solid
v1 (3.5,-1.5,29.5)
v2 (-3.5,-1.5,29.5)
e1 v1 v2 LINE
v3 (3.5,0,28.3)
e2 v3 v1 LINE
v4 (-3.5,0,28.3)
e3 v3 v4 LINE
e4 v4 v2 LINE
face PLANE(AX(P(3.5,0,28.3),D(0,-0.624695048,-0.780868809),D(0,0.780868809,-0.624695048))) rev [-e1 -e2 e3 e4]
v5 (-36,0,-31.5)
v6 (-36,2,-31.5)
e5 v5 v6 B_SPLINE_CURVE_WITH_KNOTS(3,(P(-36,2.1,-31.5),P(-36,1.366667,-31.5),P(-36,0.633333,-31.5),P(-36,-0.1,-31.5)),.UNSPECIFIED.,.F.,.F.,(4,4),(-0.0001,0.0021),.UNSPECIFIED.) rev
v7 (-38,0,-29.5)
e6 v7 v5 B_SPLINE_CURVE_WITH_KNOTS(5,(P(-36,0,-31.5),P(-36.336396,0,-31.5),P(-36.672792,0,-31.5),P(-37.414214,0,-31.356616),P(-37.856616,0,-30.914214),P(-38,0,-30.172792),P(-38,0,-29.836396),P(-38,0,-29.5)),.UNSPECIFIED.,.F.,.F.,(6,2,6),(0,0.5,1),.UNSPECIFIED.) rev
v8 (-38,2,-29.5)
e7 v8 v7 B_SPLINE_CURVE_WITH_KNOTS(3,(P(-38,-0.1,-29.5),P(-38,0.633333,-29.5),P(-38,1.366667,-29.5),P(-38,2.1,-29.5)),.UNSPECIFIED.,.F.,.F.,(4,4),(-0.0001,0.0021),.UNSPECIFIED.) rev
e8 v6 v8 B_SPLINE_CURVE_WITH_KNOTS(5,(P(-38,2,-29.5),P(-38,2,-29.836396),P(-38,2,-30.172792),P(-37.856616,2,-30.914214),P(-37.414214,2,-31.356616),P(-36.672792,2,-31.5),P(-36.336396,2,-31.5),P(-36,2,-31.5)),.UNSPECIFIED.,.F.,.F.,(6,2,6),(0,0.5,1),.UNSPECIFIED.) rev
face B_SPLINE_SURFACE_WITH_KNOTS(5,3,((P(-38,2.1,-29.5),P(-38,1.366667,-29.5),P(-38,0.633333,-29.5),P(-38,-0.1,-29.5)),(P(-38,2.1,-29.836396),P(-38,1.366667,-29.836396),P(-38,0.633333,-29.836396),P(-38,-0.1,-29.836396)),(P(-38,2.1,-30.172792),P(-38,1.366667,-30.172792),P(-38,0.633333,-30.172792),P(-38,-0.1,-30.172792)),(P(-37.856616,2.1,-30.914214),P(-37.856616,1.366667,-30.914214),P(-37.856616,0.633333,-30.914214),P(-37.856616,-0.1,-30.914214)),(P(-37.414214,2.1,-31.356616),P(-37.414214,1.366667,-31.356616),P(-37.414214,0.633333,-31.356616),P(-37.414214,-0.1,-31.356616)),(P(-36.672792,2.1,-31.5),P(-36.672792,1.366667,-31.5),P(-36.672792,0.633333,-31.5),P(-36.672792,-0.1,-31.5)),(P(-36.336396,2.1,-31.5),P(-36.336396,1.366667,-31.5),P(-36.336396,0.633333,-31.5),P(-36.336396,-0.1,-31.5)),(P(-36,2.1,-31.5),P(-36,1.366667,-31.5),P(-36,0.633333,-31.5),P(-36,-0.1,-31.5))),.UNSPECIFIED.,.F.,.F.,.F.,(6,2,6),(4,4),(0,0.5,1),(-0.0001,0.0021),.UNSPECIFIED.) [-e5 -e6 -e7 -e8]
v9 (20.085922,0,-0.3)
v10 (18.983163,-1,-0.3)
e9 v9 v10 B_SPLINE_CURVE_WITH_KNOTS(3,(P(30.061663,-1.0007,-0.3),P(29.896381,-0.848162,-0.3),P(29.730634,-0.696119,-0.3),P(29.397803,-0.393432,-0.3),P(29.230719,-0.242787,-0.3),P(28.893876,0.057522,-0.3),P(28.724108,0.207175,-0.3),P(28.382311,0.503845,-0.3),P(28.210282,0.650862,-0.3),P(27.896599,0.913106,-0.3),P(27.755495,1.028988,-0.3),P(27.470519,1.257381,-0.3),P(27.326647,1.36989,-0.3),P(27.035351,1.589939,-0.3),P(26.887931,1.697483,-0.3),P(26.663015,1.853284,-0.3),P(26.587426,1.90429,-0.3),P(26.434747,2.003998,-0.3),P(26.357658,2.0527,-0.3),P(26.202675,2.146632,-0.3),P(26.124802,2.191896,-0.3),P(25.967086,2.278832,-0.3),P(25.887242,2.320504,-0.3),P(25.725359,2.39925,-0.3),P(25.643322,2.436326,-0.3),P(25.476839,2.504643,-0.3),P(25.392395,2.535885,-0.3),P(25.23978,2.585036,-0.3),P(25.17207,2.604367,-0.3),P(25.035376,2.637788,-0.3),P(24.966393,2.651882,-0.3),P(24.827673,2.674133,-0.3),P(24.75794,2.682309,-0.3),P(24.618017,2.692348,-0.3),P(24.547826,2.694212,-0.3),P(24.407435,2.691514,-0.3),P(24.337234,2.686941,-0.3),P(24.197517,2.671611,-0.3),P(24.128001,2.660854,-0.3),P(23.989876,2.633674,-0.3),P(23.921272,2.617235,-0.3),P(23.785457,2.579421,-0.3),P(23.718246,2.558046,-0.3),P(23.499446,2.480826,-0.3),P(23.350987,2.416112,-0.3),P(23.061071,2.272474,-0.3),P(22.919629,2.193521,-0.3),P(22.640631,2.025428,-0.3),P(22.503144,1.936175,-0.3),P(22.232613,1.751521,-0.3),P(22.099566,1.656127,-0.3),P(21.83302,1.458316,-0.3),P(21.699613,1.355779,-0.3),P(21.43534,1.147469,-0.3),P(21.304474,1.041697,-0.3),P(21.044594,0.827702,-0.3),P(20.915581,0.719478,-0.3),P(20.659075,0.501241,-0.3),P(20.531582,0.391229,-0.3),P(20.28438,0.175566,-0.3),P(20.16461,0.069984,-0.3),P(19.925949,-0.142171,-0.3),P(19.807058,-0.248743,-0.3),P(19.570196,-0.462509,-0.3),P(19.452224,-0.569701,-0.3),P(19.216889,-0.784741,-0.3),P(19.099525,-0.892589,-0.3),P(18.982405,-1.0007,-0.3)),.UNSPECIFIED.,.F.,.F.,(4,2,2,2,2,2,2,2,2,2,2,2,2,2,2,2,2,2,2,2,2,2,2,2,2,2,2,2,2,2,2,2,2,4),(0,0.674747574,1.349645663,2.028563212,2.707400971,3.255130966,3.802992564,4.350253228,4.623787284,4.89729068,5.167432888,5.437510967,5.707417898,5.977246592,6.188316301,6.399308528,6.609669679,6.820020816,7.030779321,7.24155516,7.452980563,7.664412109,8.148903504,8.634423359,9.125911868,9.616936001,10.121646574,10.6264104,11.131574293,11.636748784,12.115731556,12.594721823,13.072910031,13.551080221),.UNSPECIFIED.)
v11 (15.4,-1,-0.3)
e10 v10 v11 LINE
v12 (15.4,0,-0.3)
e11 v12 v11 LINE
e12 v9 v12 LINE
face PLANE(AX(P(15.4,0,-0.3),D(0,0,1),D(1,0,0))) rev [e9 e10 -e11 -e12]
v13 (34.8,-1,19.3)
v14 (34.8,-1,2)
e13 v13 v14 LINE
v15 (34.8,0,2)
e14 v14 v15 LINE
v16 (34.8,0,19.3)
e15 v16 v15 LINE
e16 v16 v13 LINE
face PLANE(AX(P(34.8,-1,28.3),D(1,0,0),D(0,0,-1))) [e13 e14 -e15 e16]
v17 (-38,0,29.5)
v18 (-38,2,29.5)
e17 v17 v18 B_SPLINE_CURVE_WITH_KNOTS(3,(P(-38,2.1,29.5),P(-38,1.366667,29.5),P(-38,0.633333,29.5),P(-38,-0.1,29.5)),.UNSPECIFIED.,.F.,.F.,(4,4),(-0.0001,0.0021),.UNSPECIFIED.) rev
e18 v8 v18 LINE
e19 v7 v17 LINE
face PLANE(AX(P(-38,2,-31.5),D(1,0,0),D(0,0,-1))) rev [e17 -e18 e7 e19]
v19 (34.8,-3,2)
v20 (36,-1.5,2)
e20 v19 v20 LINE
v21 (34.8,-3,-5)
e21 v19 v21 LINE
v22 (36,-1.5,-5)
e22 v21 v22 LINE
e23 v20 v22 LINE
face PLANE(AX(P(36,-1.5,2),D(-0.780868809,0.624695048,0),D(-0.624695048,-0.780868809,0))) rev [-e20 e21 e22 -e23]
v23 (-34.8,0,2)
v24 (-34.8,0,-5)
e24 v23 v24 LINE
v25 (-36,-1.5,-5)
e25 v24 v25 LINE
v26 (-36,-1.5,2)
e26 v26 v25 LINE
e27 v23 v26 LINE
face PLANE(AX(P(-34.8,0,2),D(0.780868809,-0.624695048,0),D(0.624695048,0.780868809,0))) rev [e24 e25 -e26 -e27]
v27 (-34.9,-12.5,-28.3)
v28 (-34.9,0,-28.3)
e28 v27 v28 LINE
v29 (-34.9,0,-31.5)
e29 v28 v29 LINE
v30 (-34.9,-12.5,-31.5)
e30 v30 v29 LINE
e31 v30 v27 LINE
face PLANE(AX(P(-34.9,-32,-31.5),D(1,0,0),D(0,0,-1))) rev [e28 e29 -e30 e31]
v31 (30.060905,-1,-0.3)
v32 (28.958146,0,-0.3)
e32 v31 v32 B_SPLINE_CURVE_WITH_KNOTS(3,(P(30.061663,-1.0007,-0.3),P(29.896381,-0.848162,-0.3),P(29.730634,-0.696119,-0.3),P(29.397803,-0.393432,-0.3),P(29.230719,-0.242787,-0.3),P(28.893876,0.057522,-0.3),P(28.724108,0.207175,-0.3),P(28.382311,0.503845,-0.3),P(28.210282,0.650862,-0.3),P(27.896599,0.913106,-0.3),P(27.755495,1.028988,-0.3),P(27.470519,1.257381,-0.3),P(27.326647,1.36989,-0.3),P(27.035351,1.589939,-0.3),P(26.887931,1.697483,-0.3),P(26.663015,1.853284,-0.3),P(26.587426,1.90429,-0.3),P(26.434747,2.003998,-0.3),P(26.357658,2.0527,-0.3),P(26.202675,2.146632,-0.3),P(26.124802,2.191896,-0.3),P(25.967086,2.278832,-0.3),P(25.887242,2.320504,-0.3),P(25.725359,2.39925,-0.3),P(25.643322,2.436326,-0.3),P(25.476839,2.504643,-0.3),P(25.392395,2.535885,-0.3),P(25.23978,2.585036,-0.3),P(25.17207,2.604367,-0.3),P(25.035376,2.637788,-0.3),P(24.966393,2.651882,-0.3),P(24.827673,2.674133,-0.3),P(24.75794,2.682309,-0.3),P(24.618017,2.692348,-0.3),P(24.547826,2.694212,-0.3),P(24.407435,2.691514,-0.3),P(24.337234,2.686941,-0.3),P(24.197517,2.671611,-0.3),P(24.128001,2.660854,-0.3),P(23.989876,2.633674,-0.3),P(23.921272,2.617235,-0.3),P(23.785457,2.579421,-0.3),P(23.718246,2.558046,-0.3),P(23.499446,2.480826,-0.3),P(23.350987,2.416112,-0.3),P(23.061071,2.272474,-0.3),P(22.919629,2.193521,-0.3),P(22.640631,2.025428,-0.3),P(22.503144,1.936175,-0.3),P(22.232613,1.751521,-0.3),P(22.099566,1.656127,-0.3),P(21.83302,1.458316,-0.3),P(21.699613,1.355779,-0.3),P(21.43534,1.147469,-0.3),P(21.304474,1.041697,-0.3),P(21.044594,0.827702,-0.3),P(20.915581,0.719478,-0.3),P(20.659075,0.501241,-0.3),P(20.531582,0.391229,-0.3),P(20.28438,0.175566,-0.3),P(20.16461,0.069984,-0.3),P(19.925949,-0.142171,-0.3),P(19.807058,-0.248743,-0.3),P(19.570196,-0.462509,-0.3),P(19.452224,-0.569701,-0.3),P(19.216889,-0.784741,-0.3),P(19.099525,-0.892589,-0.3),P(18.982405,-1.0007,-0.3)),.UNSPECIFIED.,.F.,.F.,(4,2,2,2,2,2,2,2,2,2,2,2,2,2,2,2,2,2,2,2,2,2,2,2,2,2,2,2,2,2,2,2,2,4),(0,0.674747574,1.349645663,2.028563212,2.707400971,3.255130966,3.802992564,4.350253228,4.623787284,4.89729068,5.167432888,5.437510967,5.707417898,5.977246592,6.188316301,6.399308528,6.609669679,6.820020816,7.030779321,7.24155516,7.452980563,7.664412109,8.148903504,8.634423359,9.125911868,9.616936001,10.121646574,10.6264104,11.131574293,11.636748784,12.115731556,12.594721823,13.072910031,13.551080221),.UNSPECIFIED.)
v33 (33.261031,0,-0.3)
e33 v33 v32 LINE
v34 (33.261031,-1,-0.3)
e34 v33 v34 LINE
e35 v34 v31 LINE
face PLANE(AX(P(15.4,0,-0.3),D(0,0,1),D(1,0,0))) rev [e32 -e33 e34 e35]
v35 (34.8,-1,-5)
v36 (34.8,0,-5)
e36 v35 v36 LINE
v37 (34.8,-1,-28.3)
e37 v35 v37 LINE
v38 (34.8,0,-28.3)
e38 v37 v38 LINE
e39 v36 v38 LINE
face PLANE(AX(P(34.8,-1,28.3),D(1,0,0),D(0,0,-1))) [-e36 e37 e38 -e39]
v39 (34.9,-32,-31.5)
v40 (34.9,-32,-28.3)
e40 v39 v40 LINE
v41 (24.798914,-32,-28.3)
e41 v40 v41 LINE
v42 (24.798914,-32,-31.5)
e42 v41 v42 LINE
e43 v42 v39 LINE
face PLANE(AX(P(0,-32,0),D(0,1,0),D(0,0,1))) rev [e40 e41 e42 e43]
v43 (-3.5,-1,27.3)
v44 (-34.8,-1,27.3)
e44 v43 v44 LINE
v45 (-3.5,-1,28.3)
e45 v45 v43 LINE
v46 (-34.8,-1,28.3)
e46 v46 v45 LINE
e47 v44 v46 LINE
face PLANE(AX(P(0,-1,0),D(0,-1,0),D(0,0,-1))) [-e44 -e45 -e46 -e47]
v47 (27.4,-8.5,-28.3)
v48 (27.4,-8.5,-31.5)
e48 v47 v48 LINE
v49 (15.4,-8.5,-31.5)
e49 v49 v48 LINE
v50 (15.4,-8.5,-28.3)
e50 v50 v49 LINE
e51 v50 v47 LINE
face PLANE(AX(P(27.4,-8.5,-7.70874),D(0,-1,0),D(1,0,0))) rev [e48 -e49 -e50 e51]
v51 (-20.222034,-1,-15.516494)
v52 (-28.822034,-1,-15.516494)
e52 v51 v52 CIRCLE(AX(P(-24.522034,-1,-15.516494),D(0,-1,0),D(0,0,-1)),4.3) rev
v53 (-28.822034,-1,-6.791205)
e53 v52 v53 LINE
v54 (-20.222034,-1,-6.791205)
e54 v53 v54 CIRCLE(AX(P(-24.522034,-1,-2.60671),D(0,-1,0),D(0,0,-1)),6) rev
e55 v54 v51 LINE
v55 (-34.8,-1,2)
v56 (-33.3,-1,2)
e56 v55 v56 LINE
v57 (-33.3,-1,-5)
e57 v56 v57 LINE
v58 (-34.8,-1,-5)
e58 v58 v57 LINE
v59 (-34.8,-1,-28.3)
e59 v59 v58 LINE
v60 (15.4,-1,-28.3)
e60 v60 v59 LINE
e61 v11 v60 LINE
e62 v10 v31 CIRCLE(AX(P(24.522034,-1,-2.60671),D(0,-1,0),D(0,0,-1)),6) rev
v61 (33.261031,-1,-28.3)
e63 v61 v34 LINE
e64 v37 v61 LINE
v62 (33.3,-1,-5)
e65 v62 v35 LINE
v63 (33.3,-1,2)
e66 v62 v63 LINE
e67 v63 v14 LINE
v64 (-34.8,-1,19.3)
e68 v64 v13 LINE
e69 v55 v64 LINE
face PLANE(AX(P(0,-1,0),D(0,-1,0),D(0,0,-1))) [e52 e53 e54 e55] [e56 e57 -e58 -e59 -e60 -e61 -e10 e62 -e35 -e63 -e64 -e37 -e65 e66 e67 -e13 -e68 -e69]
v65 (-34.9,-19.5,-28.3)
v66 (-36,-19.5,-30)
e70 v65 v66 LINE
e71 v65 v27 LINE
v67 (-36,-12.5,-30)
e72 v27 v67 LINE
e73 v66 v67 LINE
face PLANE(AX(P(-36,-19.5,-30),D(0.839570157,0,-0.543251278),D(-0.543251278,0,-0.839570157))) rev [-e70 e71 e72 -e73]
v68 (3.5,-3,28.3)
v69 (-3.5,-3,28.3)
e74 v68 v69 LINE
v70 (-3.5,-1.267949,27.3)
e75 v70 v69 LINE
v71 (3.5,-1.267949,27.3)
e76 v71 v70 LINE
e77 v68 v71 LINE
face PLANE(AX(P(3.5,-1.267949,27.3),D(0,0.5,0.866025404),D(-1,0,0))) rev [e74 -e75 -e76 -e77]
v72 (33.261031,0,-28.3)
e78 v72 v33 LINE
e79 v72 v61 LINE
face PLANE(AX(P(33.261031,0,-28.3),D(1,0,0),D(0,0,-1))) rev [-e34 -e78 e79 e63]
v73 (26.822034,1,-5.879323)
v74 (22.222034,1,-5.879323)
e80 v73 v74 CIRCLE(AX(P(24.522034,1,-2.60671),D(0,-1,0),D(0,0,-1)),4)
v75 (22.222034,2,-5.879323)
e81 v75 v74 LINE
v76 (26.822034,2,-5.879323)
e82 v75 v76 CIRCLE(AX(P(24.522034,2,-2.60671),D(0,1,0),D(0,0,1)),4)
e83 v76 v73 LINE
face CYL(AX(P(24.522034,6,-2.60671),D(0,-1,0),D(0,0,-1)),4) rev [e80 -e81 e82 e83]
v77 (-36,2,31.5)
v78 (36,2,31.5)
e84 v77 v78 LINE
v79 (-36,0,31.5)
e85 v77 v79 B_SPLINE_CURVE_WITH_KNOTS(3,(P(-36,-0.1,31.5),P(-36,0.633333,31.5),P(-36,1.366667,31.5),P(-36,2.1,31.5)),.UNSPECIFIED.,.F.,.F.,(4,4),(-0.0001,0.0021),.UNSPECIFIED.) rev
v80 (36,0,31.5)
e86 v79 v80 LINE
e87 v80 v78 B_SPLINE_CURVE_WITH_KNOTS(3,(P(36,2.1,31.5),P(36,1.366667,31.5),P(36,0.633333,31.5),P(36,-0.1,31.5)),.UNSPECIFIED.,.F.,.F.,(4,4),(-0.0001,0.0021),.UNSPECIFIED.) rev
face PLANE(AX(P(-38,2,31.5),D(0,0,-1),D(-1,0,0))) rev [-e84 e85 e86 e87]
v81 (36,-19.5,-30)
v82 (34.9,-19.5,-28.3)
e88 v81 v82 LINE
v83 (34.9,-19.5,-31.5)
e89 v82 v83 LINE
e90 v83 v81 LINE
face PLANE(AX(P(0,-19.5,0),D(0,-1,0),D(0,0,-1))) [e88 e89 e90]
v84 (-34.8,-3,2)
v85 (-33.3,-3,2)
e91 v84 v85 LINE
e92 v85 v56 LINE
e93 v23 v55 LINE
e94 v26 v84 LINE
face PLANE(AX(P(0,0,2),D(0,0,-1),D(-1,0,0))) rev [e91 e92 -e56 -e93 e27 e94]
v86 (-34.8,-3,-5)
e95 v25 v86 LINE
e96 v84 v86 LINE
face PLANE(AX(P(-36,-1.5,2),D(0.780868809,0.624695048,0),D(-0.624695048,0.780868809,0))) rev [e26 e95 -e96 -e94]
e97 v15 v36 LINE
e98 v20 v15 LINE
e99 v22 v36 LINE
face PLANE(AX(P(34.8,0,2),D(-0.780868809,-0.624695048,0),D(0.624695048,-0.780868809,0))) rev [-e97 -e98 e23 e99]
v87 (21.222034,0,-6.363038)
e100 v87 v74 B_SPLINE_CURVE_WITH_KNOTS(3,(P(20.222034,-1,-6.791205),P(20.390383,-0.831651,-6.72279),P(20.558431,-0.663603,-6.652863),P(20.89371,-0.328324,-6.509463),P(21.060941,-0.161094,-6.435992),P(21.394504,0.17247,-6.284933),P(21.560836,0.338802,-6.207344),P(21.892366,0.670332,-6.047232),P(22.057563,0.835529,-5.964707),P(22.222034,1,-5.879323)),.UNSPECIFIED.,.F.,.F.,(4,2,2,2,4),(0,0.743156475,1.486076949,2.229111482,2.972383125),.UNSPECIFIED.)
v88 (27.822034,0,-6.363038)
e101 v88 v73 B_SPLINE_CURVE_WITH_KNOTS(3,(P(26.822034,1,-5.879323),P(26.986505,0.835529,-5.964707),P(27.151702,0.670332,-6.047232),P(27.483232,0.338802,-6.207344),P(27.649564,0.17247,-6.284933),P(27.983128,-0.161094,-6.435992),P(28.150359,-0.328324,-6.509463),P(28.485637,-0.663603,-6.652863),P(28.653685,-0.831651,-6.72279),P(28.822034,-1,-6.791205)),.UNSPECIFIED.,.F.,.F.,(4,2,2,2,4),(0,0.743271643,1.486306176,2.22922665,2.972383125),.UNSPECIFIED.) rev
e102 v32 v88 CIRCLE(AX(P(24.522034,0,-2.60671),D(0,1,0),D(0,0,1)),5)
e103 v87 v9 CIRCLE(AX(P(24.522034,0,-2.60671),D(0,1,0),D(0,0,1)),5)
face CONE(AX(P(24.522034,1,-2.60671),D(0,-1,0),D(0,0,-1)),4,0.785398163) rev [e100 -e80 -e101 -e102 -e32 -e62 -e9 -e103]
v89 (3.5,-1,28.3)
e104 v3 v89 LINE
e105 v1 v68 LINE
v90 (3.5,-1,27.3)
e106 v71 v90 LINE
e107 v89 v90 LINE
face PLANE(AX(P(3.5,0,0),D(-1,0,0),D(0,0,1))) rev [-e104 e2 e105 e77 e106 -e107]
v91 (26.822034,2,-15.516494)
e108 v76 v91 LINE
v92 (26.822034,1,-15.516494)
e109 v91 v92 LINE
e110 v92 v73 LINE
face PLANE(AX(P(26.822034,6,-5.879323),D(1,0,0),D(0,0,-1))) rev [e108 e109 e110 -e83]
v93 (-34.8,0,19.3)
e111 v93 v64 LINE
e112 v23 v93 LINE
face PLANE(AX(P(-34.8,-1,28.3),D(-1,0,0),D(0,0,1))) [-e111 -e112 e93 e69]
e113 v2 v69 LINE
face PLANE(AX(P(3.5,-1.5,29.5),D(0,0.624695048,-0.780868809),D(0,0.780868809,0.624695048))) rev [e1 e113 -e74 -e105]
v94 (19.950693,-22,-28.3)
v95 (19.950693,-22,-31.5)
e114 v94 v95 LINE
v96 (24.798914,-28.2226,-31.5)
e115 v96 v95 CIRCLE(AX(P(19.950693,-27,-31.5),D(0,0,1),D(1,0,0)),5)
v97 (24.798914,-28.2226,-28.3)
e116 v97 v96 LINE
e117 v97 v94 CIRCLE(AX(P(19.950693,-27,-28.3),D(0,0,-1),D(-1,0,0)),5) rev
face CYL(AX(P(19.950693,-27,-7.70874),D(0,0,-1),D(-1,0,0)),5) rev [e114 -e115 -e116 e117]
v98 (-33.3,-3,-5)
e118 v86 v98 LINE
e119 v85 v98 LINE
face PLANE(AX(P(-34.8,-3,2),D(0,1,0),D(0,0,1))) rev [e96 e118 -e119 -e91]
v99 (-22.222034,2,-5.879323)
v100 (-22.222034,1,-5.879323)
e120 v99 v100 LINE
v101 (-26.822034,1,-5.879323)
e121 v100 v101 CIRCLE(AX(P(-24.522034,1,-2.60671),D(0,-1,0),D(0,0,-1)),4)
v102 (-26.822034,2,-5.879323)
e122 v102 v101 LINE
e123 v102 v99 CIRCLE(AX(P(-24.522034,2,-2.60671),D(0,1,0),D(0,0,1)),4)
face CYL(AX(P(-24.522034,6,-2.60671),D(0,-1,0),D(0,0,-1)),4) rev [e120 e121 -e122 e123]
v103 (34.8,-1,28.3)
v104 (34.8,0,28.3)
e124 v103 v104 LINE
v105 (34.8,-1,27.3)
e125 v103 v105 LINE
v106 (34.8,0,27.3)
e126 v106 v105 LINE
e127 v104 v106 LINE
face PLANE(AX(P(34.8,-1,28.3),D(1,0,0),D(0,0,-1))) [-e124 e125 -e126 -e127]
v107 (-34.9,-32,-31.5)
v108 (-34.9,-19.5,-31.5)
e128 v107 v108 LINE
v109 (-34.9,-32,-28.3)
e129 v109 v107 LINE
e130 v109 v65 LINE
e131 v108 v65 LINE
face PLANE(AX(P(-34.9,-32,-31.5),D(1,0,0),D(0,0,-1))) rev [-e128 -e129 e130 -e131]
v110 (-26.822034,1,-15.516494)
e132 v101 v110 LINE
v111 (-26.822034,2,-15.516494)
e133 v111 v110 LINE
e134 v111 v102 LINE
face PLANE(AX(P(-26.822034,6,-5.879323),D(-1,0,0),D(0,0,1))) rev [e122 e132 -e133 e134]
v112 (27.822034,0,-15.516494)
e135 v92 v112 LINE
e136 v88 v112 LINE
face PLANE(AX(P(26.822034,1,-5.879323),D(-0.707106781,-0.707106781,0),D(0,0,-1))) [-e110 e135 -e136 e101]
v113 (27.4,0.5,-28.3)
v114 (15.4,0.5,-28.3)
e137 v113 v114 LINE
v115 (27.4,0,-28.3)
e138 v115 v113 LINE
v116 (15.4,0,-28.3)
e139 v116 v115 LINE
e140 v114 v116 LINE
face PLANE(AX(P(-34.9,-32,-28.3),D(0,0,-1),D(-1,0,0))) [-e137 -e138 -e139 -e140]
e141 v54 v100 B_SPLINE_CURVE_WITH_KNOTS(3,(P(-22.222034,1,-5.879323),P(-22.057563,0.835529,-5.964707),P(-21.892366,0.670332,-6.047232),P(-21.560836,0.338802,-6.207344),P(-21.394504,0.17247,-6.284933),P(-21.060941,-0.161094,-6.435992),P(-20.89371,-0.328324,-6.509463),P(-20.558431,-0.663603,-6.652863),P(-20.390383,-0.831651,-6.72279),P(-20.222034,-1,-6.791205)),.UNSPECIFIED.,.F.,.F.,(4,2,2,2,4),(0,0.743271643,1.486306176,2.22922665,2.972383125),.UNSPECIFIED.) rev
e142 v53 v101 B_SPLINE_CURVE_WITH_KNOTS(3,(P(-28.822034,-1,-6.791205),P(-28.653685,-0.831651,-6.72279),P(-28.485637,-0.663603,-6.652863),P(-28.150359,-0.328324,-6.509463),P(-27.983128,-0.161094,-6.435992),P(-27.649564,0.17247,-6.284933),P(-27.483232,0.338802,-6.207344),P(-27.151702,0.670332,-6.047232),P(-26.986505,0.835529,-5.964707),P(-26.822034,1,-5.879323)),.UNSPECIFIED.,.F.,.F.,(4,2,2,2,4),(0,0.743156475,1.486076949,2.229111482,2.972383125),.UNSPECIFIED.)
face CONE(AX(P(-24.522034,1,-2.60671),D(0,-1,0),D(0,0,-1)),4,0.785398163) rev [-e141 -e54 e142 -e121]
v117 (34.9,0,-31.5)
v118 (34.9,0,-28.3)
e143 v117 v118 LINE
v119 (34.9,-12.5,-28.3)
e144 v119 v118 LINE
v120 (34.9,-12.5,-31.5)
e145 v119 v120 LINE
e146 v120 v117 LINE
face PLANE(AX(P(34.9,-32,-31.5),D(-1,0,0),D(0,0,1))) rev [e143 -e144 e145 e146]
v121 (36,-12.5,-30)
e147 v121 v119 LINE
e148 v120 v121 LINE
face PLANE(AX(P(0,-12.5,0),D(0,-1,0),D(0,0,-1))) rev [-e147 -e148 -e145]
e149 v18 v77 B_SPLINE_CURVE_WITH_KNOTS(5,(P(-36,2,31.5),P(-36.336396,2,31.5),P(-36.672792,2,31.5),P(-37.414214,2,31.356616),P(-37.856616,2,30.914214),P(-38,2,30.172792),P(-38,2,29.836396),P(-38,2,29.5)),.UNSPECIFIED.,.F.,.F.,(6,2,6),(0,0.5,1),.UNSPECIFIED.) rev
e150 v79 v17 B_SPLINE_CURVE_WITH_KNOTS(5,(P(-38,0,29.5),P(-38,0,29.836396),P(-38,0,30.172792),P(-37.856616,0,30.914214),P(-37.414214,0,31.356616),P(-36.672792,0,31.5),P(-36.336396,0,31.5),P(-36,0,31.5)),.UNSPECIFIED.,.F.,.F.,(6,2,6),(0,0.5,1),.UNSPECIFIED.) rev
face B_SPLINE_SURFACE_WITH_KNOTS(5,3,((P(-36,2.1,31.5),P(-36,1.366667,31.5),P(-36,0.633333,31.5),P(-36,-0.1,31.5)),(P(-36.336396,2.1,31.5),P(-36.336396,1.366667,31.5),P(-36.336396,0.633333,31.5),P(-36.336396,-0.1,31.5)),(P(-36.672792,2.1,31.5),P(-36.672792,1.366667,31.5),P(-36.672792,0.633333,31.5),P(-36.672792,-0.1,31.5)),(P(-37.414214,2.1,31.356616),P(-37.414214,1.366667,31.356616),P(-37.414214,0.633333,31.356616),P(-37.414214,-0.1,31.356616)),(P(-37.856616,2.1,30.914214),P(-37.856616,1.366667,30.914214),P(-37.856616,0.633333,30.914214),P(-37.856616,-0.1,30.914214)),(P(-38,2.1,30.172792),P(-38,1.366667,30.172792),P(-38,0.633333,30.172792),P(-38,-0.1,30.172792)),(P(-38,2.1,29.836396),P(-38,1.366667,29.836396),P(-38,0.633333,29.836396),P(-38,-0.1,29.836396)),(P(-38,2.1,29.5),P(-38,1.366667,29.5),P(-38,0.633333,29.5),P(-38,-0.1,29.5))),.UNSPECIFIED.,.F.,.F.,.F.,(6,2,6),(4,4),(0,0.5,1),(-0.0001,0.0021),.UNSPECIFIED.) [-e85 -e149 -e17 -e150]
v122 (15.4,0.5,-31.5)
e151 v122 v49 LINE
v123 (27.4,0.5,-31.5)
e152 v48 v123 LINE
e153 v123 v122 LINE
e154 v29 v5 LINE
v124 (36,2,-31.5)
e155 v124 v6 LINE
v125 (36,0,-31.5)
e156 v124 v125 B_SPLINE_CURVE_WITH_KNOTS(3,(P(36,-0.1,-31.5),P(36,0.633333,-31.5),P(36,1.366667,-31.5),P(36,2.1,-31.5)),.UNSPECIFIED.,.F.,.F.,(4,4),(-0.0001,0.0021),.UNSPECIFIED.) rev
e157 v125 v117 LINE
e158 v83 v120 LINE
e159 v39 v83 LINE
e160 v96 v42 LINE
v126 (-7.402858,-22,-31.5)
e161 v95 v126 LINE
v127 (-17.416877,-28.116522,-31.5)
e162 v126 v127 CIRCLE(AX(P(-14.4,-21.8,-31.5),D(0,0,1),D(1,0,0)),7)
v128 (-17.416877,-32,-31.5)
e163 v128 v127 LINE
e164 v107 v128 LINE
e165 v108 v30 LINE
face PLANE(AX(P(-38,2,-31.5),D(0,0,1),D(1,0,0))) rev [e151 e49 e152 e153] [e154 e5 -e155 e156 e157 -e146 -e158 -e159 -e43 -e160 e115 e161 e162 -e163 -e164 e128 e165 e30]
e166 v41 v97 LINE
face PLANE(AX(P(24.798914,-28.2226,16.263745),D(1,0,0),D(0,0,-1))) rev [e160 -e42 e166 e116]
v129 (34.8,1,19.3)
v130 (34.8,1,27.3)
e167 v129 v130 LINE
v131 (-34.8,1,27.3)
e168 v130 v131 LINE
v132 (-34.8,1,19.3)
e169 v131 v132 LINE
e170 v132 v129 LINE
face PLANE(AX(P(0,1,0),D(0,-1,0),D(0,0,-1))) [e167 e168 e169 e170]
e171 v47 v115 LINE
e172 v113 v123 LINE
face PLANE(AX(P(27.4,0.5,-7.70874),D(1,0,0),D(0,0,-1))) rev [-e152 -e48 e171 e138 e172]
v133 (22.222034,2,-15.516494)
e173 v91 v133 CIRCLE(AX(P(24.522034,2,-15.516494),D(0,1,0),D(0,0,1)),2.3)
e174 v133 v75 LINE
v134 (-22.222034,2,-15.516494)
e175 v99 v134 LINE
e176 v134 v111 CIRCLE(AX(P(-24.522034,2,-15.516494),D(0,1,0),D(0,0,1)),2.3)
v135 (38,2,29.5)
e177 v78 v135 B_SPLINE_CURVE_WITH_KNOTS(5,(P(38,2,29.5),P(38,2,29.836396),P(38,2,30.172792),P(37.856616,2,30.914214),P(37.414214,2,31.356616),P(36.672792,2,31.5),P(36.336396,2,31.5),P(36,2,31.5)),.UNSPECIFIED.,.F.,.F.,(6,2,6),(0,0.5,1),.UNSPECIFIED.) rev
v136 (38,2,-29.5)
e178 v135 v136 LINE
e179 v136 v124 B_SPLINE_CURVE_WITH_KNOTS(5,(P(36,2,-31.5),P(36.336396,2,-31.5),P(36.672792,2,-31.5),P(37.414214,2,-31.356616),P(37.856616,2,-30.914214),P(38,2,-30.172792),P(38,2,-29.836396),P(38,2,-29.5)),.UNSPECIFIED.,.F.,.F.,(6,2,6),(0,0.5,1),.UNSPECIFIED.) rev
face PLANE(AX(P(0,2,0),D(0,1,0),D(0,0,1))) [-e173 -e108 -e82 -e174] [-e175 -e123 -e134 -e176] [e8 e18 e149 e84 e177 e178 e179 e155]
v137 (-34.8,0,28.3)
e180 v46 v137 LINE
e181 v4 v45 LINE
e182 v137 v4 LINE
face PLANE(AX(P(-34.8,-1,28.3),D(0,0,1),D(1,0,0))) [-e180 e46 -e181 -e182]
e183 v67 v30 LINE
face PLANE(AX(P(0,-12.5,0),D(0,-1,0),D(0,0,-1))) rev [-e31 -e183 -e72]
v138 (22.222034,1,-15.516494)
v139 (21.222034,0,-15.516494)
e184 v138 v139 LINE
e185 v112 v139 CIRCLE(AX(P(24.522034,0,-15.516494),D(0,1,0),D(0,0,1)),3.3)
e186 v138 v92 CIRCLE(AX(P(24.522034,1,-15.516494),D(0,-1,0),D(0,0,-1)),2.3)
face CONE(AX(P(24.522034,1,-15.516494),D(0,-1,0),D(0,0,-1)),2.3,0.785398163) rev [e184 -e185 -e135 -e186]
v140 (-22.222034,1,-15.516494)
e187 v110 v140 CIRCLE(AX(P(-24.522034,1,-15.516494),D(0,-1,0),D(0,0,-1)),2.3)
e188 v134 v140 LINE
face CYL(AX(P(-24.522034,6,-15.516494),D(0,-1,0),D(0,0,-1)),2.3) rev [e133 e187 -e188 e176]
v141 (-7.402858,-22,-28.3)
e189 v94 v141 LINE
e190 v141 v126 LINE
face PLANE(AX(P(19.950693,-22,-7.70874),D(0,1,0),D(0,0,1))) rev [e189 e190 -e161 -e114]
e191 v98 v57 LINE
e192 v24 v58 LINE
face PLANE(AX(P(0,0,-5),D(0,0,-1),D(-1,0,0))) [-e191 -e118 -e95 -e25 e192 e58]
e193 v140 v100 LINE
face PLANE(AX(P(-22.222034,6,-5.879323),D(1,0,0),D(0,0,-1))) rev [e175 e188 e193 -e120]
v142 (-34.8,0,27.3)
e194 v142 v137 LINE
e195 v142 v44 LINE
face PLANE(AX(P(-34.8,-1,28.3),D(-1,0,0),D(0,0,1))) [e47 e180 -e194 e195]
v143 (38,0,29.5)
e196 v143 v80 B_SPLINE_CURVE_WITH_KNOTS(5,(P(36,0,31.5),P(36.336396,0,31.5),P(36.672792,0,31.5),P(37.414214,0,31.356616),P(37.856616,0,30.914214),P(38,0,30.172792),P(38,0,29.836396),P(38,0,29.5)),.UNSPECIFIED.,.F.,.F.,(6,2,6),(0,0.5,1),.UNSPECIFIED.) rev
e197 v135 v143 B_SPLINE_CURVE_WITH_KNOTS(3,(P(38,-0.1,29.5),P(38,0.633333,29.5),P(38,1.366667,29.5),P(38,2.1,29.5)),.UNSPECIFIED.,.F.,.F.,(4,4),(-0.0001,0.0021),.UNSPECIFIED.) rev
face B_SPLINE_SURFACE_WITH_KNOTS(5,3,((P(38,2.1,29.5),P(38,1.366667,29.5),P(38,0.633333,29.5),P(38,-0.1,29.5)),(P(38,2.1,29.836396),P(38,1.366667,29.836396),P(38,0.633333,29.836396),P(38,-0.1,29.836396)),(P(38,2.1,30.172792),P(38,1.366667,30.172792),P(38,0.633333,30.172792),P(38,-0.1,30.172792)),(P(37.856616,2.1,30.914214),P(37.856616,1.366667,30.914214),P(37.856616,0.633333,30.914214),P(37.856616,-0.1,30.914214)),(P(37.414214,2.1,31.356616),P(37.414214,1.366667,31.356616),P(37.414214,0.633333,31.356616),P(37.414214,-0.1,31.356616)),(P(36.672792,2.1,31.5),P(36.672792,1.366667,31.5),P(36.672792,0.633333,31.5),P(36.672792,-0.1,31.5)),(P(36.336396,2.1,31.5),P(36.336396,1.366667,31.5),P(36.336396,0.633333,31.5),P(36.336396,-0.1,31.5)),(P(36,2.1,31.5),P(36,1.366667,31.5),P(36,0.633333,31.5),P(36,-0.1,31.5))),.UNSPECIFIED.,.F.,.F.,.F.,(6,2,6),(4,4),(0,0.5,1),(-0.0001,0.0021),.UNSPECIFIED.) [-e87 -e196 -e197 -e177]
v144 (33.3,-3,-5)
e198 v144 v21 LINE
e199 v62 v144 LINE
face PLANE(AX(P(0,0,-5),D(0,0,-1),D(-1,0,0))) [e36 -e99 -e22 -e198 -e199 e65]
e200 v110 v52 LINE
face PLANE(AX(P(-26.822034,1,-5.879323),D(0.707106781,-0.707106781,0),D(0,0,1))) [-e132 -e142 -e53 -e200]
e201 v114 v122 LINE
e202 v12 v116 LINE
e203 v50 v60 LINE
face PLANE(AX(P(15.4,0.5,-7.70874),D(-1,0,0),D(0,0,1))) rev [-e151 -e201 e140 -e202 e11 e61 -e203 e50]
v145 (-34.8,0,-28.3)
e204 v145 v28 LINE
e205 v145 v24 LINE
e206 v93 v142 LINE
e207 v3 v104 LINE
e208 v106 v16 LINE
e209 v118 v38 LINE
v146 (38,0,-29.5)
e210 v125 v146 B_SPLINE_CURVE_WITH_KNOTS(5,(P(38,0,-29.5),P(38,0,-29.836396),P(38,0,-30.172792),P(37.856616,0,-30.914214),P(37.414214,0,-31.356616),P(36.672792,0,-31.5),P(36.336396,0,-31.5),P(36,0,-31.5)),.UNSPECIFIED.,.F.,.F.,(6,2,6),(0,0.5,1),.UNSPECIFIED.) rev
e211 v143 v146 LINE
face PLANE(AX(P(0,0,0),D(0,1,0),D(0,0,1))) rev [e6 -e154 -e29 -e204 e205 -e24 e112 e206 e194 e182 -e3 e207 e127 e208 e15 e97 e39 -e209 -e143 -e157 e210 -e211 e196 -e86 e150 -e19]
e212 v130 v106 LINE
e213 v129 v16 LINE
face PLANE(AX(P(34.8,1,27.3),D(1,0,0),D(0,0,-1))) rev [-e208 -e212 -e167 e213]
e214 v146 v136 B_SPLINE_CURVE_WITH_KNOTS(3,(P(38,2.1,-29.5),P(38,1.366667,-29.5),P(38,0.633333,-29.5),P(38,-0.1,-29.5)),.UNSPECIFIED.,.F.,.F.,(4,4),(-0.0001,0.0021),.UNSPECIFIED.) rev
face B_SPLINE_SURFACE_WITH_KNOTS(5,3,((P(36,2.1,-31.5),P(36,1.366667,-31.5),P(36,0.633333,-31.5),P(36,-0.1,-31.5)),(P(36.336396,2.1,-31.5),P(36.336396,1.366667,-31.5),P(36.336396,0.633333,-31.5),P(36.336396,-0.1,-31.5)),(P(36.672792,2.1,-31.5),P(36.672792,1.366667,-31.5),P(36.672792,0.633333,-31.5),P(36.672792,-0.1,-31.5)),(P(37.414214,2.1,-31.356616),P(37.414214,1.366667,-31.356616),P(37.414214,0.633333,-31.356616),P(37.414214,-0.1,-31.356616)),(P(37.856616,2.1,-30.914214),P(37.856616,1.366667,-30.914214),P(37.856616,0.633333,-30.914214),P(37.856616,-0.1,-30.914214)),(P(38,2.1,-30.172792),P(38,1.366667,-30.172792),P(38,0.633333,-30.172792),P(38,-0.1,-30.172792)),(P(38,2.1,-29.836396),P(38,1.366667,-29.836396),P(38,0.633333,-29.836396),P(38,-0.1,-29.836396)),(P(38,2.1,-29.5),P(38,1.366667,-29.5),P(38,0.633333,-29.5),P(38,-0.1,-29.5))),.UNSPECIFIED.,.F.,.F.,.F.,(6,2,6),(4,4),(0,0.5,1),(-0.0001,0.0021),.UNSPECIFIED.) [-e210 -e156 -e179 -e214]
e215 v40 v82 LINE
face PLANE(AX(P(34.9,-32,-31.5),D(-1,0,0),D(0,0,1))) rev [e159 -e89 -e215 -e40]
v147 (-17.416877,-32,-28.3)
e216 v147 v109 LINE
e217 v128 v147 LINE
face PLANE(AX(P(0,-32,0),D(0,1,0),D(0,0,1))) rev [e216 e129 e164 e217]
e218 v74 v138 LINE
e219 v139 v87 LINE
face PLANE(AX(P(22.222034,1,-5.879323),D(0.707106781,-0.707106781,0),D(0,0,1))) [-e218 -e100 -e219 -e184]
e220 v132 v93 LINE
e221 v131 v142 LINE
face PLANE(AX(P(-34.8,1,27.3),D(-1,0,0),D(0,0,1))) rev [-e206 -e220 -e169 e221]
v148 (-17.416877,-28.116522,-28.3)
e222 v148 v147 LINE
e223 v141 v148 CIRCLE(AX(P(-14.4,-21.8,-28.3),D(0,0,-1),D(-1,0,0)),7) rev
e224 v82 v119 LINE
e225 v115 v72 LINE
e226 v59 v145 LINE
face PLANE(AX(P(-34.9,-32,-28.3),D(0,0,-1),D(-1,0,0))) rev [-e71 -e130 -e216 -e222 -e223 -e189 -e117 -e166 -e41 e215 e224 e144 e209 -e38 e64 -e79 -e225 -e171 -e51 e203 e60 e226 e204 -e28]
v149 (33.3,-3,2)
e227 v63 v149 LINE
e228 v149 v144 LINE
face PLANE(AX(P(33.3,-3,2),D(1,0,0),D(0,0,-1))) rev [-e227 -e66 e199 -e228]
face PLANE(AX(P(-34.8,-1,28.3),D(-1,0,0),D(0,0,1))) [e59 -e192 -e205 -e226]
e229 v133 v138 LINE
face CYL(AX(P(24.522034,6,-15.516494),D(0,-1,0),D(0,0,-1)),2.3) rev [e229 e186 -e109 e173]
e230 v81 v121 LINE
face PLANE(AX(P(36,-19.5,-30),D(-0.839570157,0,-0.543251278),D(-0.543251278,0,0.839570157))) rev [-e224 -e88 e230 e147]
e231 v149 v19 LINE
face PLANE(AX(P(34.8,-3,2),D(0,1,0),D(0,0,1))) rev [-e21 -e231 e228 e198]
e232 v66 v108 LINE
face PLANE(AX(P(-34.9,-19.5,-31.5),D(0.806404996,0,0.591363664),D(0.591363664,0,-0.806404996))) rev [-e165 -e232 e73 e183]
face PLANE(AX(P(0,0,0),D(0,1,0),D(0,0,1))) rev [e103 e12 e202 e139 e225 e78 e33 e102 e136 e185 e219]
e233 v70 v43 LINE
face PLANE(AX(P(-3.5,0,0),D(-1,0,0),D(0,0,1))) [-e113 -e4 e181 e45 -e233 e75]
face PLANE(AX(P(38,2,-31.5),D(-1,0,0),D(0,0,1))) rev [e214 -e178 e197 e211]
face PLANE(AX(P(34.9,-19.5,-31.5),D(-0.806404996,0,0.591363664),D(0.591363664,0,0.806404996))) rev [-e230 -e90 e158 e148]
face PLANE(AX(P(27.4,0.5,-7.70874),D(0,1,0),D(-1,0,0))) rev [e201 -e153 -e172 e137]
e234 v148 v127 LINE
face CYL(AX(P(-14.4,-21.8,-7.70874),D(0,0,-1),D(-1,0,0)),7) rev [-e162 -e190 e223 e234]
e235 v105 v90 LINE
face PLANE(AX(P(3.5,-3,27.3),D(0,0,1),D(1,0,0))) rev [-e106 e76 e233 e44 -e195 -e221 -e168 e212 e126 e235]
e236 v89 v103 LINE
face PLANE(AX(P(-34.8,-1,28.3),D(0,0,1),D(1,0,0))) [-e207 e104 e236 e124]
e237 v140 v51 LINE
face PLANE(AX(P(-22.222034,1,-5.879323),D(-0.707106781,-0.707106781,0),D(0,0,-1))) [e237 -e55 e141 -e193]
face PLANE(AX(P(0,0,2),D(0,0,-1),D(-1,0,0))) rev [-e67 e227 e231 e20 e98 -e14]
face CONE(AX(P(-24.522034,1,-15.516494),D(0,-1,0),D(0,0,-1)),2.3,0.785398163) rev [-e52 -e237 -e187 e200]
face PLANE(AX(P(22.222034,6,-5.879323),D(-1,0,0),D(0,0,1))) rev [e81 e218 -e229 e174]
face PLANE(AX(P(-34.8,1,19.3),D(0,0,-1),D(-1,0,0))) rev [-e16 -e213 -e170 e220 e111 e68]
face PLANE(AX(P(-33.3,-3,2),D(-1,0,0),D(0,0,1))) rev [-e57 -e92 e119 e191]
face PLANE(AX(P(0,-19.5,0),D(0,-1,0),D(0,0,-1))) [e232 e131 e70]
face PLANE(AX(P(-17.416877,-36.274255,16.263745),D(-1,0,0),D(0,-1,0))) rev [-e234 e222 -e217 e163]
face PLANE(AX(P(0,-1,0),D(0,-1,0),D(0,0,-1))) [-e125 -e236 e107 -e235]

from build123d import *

# Parameters (mm, degrees)
SKETCH1_W               = 76
SKETCH1_H               = 63
BOSS_EXTRUDE1_DEPTH     = 2
SKETCH2_W               = 69.6
SKETCH2_H               = 56.6
BOSS_EXTRUDE2_DEPTH     = 1
SKETCH3_W               = 69.8
SKETCH3_H               = 3.2
BOSS_EXTRUDE3_DEPTH     = 32
BOSS_EXTRUDE4_DEPTH     = 3.5
BOSS_EXTRUDE5_DEPTH     = 3.5
BOSS_EXTRUDE6_DEPTH     = 3.5
CUT_EXTRUDE1_DEPTH      = 7
CHAMFER1_SIZE           = 2
FILLET1_SIZE            = 2
CUT_EXTRUDE2_DEPTH      = 81.23091686
CUT_EXTRUDE2_DEPTH_BACK = 3.2
SKETCH8_R               = 7
SKETCH8_W               = 12
SKETCH8_H               = 9
SKETCH9_W               = 17.861030929
SKETCH9_H               = 28
CUT_EXTRUDE3_DEPTH      = 1
SKETCH10_W              = 69.6
SKETCH10_H              = 8
CUT_EXTRUDE4_DEPTH      = 2
CHAMFER2_SIZE2          = 1
CHAMFER2_SIZE           = 1.732050808
CUT_EXTRUDE5_DEPTH      = 3.2


# Some blends are built 0.0001 mm under size
with BuildPart() as part:
    # Sketch1 → Boss-Extrude1 (new body)
    with BuildSketch(Plane(origin=(0, 0, 0), x_dir=(1, 0, 0), z_dir=(0, 1, 0))):
        Rectangle(SKETCH1_W, SKETCH1_H)
    extrude(amount=BOSS_EXTRUDE1_DEPTH)

    # Sketch2 → Boss-Extrude2 (add)
    with BuildSketch(Plane(origin=(0, 0, 0), x_dir=(1, 0, 0), z_dir=(0, 1, 0))):
        Rectangle(SKETCH2_W, SKETCH2_H)
    extrude(amount=-BOSS_EXTRUDE2_DEPTH)

    # Sketch3 → Boss-Extrude3 (add)
    with BuildSketch(Plane.XZ):
        with Locations((0, -29.9)):
            Rectangle(SKETCH3_W, SKETCH3_H)
    extrude(amount=BOSS_EXTRUDE3_DEPTH)

    # Sketch4 → Boss-Extrude4 (add, symmetric)
    with BuildSketch(Plane.XY.offset(-1.5)):
        Polygon((-34.8, 0), (-36, -1.5), (-34.8, -3), (-33.3, -3), (-33.3, 0), align=None)
        Polygon((33.3, 0), (34.8, 0), (36, -1.5), (34.8, -3), (33.3, -3), align=None)
    extrude(amount=BOSS_EXTRUDE4_DEPTH, both=True)

    # Sketch5 → Boss-Extrude5 (add, symmetric)
    with BuildSketch(Plane(origin=(0, 0, 0), x_dir=(0, 0, -1), z_dir=(1, 0, 0))):
        Polygon((-28.3, 0), (-29.5, -1.5), (-28.3, -3), (-27.3, -3), (-27.3, 0), align=None)
    extrude(amount=BOSS_EXTRUDE5_DEPTH, both=True)

    # Sketch6 → Boss-Extrude6 (add, symmetric)
    with BuildSketch(Plane(origin=(0, -16, 0), x_dir=(-1, 0, 0), z_dir=(0, -1, 0))):
        Polygon((-34.9, 31.5), (-36, 30), (-34.9, 28.3), align=None)
        Polygon((34.9, 28.3), (34.9, 31.5), (36, 30), align=None)
    extrude(amount=BOSS_EXTRUDE6_DEPTH, both=True)

    # Sketch7 → Cut-Extrude1 (cut)
    with BuildSketch(Plane.XZ.offset(1)):
        with BuildLine():
            Line((-26.822034097, -5.879323383), (-26.822034097, -15.516493675))
            ThreePointArc((-26.822034097, -15.516493675), (-24.522034097, -17.816493675), (-22.222034097, -15.516493675))
            Line((-22.222034097, -15.516493675), (-22.222034097, -5.879323383))
            ThreePointArc((-22.222034097, -5.879323383), (-24.522034097, 1.393290251), (-26.822034097, -5.879323383))
        make_face()
        with BuildLine():
            Line((22.222034097, -5.879323383), (22.222034097, -15.516493675))
            ThreePointArc((22.222034097, -15.516493675), (24.522034097, -17.816493675), (26.822034097, -15.516493675))
            Line((26.822034097, -15.516493675), (26.822034097, -5.879323383))
            ThreePointArc((26.822034097, -5.879323383), (24.522034097, 1.393290251), (22.222034097, -5.879323383))
        make_face()
    extrude(amount=-CUT_EXTRUDE1_DEPTH, mode=Mode.SUBTRACT)

    # Chamfer1
    chamfer1_edges = [part.edges().sort_by_distance(p)[0] for p in [
        (-24.522034097, -1, 1.393290251),
        (-26.822034097, -1, -10.697908529),
        (-24.522034097, -1, -17.816493675),
        (-22.222034097, -1, -10.697908529),
        (24.522034097, -1, -17.816493675),
        (26.822034097, -1, -10.697908529),
        (24.522034097, -1, 1.393290251),
        (22.222034097, -1, -10.697908529),
    ]]
    chamfer(chamfer1_edges, length=CHAMFER1_SIZE)

    # Fillet1
    # a fillet whose section is not a circle: 2 mm, written as the material it takes off along each edge
    with BuildSketch(Plane(origin=(38, -5, 31.5), x_dir=(0, 0, -1), z_dir=(0, 1, 0)), Plane(origin=(38, -5, -31.5), x_dir=(-1, 0, 0), z_dir=(0, 1, 0))) as fillet1_piece_1:
        with BuildLine():
            add(Edge.make_bspline([(FILLET1_SIZE, 0), (FILLET1_SIZE * 0.831801948466, 0), (FILLET1_SIZE * 0.663603896932, 0), (FILLET1_SIZE * 0.292893218813, FILLET1_SIZE * 0.0716919198361), (FILLET1_SIZE * 0.0716919198361, FILLET1_SIZE * 0.292893218813), (0, FILLET1_SIZE * 0.663603896932), (0, FILLET1_SIZE * 0.831801948466), (0, FILLET1_SIZE)], knots=[0, 0, 0, 0, 0, 0, 0.5, 0.5, 1, 1, 1, 1, 1, 1], degree=5))
            Line((0, FILLET1_SIZE), (0, 0))
            Line((0, 0), (FILLET1_SIZE, 0))
        make_face()
    extrude(amount=12, mode=Mode.SUBTRACT)
    with BuildSketch(Plane(origin=(-38, -5, 31.5), x_dir=(0, 0, -1), z_dir=(0, 1, 0)), Plane(origin=(-38, -5, -31.5), x_dir=(1, 0, 0), z_dir=(0, 1, 0))) as fillet1_piece_2:
        with BuildLine():
            add(Edge.make_bspline([(FILLET1_SIZE, 0), (FILLET1_SIZE * 0.831801948466, 0), (FILLET1_SIZE * 0.663603896932, 0), (FILLET1_SIZE * 0.292893218813, -FILLET1_SIZE * 0.0716919198361), (FILLET1_SIZE * 0.0716919198361, -FILLET1_SIZE * 0.292893218813), (0, -FILLET1_SIZE * 0.663603896932), (0, -FILLET1_SIZE * 0.831801948466), (0, -FILLET1_SIZE)], knots=[0, 0, 0, 0, 0, 0, 0.5, 0.5, 1, 1, 1, 1, 1, 1], degree=5))
            Line((0, -FILLET1_SIZE), (0, 0))
            Line((0, 0), (FILLET1_SIZE, 0))
        make_face()
    extrude(amount=12, mode=Mode.SUBTRACT)

    # Sketch8 → Cut-Extrude2 (cut, two sides: drawn at the far end of the back side and taken through both)
    with BuildSketch(Plane(origin=(0, 0, -31.5), x_dir=(-1, 0, 0), z_dir=(0, 0, -1)).offset(-CUT_EXTRUDE2_DEPTH_BACK)):
        with Locations((14.4, -21.8)):
            Circle(SKETCH8_R)
        with BuildLine():
            Line((-19.95069293, -22), (-11.95069293, -22))
            ThreePointArc((-11.95069293, -22), (-6.95069293, -27), (-11.95069293, -32))
            Line((-11.95069293, -32), (-19.95069293, -32))
            ThreePointArc((-19.95069293, -32), (-24.95069293, -27), (-19.95069293, -22))
        make_face()
        with Locations((-21.4, -4)):
            Rectangle(SKETCH8_W, SKETCH8_H)
    extrude(amount=CUT_EXTRUDE2_DEPTH + CUT_EXTRUDE2_DEPTH_BACK, mode=Mode.SUBTRACT)

    # Sketch9 → Cut-Extrude3 (cut)
    with BuildSketch(Plane.XZ.offset(1)):
        with Locations((24.330515464, -14.3)):
            Rectangle(SKETCH9_W, SKETCH9_H)
    extrude(amount=-CUT_EXTRUDE3_DEPTH, mode=Mode.SUBTRACT)

    # Sketch10 → Cut-Extrude4 (cut)
    with BuildSketch(Plane.XZ.offset(1)):
        with Locations((0, 23.3)):
            Rectangle(SKETCH10_W, SKETCH10_H)
    extrude(amount=-CUT_EXTRUDE4_DEPTH, mode=Mode.SUBTRACT)

    # Chamfer2
    chamfer2_edges = [part.edges().sort_by_distance(p)[0] for p in [
        (0, -3, 27.3),
    ]]
    chamfer2_side = [part.faces().sort_by_distance(p)[0] for p in [
        (0, -2.98, 27.3),
    ]]
    chamfer(chamfer2_edges, length=CHAMFER2_SIZE - 0.0001, length2=CHAMFER2_SIZE2 - 0.0001, reference=chamfer2_side[0])  # a hair under: the kernel refuses the full size

    # Sketch11 → Cut-Extrude5 (cut)
    with BuildSketch(Plane(origin=(0, 0, -31.5), x_dir=(-1, 0, 0), z_dir=(0, 0, -1))):
        Polygon((-24.798914111, -28.222600255), (-24.798914111, -36.274254695), (17.416877144, -36.274254695), (17.416877144, -28.116522168), (7.402857726, -22), (-13.082910041, -22), (-13.082910041, -28.222600255), align=None)
    extrude(amount=-CUT_EXTRUDE5_DEPTH, mode=Mode.SUBTRACT)


solid = part.part
